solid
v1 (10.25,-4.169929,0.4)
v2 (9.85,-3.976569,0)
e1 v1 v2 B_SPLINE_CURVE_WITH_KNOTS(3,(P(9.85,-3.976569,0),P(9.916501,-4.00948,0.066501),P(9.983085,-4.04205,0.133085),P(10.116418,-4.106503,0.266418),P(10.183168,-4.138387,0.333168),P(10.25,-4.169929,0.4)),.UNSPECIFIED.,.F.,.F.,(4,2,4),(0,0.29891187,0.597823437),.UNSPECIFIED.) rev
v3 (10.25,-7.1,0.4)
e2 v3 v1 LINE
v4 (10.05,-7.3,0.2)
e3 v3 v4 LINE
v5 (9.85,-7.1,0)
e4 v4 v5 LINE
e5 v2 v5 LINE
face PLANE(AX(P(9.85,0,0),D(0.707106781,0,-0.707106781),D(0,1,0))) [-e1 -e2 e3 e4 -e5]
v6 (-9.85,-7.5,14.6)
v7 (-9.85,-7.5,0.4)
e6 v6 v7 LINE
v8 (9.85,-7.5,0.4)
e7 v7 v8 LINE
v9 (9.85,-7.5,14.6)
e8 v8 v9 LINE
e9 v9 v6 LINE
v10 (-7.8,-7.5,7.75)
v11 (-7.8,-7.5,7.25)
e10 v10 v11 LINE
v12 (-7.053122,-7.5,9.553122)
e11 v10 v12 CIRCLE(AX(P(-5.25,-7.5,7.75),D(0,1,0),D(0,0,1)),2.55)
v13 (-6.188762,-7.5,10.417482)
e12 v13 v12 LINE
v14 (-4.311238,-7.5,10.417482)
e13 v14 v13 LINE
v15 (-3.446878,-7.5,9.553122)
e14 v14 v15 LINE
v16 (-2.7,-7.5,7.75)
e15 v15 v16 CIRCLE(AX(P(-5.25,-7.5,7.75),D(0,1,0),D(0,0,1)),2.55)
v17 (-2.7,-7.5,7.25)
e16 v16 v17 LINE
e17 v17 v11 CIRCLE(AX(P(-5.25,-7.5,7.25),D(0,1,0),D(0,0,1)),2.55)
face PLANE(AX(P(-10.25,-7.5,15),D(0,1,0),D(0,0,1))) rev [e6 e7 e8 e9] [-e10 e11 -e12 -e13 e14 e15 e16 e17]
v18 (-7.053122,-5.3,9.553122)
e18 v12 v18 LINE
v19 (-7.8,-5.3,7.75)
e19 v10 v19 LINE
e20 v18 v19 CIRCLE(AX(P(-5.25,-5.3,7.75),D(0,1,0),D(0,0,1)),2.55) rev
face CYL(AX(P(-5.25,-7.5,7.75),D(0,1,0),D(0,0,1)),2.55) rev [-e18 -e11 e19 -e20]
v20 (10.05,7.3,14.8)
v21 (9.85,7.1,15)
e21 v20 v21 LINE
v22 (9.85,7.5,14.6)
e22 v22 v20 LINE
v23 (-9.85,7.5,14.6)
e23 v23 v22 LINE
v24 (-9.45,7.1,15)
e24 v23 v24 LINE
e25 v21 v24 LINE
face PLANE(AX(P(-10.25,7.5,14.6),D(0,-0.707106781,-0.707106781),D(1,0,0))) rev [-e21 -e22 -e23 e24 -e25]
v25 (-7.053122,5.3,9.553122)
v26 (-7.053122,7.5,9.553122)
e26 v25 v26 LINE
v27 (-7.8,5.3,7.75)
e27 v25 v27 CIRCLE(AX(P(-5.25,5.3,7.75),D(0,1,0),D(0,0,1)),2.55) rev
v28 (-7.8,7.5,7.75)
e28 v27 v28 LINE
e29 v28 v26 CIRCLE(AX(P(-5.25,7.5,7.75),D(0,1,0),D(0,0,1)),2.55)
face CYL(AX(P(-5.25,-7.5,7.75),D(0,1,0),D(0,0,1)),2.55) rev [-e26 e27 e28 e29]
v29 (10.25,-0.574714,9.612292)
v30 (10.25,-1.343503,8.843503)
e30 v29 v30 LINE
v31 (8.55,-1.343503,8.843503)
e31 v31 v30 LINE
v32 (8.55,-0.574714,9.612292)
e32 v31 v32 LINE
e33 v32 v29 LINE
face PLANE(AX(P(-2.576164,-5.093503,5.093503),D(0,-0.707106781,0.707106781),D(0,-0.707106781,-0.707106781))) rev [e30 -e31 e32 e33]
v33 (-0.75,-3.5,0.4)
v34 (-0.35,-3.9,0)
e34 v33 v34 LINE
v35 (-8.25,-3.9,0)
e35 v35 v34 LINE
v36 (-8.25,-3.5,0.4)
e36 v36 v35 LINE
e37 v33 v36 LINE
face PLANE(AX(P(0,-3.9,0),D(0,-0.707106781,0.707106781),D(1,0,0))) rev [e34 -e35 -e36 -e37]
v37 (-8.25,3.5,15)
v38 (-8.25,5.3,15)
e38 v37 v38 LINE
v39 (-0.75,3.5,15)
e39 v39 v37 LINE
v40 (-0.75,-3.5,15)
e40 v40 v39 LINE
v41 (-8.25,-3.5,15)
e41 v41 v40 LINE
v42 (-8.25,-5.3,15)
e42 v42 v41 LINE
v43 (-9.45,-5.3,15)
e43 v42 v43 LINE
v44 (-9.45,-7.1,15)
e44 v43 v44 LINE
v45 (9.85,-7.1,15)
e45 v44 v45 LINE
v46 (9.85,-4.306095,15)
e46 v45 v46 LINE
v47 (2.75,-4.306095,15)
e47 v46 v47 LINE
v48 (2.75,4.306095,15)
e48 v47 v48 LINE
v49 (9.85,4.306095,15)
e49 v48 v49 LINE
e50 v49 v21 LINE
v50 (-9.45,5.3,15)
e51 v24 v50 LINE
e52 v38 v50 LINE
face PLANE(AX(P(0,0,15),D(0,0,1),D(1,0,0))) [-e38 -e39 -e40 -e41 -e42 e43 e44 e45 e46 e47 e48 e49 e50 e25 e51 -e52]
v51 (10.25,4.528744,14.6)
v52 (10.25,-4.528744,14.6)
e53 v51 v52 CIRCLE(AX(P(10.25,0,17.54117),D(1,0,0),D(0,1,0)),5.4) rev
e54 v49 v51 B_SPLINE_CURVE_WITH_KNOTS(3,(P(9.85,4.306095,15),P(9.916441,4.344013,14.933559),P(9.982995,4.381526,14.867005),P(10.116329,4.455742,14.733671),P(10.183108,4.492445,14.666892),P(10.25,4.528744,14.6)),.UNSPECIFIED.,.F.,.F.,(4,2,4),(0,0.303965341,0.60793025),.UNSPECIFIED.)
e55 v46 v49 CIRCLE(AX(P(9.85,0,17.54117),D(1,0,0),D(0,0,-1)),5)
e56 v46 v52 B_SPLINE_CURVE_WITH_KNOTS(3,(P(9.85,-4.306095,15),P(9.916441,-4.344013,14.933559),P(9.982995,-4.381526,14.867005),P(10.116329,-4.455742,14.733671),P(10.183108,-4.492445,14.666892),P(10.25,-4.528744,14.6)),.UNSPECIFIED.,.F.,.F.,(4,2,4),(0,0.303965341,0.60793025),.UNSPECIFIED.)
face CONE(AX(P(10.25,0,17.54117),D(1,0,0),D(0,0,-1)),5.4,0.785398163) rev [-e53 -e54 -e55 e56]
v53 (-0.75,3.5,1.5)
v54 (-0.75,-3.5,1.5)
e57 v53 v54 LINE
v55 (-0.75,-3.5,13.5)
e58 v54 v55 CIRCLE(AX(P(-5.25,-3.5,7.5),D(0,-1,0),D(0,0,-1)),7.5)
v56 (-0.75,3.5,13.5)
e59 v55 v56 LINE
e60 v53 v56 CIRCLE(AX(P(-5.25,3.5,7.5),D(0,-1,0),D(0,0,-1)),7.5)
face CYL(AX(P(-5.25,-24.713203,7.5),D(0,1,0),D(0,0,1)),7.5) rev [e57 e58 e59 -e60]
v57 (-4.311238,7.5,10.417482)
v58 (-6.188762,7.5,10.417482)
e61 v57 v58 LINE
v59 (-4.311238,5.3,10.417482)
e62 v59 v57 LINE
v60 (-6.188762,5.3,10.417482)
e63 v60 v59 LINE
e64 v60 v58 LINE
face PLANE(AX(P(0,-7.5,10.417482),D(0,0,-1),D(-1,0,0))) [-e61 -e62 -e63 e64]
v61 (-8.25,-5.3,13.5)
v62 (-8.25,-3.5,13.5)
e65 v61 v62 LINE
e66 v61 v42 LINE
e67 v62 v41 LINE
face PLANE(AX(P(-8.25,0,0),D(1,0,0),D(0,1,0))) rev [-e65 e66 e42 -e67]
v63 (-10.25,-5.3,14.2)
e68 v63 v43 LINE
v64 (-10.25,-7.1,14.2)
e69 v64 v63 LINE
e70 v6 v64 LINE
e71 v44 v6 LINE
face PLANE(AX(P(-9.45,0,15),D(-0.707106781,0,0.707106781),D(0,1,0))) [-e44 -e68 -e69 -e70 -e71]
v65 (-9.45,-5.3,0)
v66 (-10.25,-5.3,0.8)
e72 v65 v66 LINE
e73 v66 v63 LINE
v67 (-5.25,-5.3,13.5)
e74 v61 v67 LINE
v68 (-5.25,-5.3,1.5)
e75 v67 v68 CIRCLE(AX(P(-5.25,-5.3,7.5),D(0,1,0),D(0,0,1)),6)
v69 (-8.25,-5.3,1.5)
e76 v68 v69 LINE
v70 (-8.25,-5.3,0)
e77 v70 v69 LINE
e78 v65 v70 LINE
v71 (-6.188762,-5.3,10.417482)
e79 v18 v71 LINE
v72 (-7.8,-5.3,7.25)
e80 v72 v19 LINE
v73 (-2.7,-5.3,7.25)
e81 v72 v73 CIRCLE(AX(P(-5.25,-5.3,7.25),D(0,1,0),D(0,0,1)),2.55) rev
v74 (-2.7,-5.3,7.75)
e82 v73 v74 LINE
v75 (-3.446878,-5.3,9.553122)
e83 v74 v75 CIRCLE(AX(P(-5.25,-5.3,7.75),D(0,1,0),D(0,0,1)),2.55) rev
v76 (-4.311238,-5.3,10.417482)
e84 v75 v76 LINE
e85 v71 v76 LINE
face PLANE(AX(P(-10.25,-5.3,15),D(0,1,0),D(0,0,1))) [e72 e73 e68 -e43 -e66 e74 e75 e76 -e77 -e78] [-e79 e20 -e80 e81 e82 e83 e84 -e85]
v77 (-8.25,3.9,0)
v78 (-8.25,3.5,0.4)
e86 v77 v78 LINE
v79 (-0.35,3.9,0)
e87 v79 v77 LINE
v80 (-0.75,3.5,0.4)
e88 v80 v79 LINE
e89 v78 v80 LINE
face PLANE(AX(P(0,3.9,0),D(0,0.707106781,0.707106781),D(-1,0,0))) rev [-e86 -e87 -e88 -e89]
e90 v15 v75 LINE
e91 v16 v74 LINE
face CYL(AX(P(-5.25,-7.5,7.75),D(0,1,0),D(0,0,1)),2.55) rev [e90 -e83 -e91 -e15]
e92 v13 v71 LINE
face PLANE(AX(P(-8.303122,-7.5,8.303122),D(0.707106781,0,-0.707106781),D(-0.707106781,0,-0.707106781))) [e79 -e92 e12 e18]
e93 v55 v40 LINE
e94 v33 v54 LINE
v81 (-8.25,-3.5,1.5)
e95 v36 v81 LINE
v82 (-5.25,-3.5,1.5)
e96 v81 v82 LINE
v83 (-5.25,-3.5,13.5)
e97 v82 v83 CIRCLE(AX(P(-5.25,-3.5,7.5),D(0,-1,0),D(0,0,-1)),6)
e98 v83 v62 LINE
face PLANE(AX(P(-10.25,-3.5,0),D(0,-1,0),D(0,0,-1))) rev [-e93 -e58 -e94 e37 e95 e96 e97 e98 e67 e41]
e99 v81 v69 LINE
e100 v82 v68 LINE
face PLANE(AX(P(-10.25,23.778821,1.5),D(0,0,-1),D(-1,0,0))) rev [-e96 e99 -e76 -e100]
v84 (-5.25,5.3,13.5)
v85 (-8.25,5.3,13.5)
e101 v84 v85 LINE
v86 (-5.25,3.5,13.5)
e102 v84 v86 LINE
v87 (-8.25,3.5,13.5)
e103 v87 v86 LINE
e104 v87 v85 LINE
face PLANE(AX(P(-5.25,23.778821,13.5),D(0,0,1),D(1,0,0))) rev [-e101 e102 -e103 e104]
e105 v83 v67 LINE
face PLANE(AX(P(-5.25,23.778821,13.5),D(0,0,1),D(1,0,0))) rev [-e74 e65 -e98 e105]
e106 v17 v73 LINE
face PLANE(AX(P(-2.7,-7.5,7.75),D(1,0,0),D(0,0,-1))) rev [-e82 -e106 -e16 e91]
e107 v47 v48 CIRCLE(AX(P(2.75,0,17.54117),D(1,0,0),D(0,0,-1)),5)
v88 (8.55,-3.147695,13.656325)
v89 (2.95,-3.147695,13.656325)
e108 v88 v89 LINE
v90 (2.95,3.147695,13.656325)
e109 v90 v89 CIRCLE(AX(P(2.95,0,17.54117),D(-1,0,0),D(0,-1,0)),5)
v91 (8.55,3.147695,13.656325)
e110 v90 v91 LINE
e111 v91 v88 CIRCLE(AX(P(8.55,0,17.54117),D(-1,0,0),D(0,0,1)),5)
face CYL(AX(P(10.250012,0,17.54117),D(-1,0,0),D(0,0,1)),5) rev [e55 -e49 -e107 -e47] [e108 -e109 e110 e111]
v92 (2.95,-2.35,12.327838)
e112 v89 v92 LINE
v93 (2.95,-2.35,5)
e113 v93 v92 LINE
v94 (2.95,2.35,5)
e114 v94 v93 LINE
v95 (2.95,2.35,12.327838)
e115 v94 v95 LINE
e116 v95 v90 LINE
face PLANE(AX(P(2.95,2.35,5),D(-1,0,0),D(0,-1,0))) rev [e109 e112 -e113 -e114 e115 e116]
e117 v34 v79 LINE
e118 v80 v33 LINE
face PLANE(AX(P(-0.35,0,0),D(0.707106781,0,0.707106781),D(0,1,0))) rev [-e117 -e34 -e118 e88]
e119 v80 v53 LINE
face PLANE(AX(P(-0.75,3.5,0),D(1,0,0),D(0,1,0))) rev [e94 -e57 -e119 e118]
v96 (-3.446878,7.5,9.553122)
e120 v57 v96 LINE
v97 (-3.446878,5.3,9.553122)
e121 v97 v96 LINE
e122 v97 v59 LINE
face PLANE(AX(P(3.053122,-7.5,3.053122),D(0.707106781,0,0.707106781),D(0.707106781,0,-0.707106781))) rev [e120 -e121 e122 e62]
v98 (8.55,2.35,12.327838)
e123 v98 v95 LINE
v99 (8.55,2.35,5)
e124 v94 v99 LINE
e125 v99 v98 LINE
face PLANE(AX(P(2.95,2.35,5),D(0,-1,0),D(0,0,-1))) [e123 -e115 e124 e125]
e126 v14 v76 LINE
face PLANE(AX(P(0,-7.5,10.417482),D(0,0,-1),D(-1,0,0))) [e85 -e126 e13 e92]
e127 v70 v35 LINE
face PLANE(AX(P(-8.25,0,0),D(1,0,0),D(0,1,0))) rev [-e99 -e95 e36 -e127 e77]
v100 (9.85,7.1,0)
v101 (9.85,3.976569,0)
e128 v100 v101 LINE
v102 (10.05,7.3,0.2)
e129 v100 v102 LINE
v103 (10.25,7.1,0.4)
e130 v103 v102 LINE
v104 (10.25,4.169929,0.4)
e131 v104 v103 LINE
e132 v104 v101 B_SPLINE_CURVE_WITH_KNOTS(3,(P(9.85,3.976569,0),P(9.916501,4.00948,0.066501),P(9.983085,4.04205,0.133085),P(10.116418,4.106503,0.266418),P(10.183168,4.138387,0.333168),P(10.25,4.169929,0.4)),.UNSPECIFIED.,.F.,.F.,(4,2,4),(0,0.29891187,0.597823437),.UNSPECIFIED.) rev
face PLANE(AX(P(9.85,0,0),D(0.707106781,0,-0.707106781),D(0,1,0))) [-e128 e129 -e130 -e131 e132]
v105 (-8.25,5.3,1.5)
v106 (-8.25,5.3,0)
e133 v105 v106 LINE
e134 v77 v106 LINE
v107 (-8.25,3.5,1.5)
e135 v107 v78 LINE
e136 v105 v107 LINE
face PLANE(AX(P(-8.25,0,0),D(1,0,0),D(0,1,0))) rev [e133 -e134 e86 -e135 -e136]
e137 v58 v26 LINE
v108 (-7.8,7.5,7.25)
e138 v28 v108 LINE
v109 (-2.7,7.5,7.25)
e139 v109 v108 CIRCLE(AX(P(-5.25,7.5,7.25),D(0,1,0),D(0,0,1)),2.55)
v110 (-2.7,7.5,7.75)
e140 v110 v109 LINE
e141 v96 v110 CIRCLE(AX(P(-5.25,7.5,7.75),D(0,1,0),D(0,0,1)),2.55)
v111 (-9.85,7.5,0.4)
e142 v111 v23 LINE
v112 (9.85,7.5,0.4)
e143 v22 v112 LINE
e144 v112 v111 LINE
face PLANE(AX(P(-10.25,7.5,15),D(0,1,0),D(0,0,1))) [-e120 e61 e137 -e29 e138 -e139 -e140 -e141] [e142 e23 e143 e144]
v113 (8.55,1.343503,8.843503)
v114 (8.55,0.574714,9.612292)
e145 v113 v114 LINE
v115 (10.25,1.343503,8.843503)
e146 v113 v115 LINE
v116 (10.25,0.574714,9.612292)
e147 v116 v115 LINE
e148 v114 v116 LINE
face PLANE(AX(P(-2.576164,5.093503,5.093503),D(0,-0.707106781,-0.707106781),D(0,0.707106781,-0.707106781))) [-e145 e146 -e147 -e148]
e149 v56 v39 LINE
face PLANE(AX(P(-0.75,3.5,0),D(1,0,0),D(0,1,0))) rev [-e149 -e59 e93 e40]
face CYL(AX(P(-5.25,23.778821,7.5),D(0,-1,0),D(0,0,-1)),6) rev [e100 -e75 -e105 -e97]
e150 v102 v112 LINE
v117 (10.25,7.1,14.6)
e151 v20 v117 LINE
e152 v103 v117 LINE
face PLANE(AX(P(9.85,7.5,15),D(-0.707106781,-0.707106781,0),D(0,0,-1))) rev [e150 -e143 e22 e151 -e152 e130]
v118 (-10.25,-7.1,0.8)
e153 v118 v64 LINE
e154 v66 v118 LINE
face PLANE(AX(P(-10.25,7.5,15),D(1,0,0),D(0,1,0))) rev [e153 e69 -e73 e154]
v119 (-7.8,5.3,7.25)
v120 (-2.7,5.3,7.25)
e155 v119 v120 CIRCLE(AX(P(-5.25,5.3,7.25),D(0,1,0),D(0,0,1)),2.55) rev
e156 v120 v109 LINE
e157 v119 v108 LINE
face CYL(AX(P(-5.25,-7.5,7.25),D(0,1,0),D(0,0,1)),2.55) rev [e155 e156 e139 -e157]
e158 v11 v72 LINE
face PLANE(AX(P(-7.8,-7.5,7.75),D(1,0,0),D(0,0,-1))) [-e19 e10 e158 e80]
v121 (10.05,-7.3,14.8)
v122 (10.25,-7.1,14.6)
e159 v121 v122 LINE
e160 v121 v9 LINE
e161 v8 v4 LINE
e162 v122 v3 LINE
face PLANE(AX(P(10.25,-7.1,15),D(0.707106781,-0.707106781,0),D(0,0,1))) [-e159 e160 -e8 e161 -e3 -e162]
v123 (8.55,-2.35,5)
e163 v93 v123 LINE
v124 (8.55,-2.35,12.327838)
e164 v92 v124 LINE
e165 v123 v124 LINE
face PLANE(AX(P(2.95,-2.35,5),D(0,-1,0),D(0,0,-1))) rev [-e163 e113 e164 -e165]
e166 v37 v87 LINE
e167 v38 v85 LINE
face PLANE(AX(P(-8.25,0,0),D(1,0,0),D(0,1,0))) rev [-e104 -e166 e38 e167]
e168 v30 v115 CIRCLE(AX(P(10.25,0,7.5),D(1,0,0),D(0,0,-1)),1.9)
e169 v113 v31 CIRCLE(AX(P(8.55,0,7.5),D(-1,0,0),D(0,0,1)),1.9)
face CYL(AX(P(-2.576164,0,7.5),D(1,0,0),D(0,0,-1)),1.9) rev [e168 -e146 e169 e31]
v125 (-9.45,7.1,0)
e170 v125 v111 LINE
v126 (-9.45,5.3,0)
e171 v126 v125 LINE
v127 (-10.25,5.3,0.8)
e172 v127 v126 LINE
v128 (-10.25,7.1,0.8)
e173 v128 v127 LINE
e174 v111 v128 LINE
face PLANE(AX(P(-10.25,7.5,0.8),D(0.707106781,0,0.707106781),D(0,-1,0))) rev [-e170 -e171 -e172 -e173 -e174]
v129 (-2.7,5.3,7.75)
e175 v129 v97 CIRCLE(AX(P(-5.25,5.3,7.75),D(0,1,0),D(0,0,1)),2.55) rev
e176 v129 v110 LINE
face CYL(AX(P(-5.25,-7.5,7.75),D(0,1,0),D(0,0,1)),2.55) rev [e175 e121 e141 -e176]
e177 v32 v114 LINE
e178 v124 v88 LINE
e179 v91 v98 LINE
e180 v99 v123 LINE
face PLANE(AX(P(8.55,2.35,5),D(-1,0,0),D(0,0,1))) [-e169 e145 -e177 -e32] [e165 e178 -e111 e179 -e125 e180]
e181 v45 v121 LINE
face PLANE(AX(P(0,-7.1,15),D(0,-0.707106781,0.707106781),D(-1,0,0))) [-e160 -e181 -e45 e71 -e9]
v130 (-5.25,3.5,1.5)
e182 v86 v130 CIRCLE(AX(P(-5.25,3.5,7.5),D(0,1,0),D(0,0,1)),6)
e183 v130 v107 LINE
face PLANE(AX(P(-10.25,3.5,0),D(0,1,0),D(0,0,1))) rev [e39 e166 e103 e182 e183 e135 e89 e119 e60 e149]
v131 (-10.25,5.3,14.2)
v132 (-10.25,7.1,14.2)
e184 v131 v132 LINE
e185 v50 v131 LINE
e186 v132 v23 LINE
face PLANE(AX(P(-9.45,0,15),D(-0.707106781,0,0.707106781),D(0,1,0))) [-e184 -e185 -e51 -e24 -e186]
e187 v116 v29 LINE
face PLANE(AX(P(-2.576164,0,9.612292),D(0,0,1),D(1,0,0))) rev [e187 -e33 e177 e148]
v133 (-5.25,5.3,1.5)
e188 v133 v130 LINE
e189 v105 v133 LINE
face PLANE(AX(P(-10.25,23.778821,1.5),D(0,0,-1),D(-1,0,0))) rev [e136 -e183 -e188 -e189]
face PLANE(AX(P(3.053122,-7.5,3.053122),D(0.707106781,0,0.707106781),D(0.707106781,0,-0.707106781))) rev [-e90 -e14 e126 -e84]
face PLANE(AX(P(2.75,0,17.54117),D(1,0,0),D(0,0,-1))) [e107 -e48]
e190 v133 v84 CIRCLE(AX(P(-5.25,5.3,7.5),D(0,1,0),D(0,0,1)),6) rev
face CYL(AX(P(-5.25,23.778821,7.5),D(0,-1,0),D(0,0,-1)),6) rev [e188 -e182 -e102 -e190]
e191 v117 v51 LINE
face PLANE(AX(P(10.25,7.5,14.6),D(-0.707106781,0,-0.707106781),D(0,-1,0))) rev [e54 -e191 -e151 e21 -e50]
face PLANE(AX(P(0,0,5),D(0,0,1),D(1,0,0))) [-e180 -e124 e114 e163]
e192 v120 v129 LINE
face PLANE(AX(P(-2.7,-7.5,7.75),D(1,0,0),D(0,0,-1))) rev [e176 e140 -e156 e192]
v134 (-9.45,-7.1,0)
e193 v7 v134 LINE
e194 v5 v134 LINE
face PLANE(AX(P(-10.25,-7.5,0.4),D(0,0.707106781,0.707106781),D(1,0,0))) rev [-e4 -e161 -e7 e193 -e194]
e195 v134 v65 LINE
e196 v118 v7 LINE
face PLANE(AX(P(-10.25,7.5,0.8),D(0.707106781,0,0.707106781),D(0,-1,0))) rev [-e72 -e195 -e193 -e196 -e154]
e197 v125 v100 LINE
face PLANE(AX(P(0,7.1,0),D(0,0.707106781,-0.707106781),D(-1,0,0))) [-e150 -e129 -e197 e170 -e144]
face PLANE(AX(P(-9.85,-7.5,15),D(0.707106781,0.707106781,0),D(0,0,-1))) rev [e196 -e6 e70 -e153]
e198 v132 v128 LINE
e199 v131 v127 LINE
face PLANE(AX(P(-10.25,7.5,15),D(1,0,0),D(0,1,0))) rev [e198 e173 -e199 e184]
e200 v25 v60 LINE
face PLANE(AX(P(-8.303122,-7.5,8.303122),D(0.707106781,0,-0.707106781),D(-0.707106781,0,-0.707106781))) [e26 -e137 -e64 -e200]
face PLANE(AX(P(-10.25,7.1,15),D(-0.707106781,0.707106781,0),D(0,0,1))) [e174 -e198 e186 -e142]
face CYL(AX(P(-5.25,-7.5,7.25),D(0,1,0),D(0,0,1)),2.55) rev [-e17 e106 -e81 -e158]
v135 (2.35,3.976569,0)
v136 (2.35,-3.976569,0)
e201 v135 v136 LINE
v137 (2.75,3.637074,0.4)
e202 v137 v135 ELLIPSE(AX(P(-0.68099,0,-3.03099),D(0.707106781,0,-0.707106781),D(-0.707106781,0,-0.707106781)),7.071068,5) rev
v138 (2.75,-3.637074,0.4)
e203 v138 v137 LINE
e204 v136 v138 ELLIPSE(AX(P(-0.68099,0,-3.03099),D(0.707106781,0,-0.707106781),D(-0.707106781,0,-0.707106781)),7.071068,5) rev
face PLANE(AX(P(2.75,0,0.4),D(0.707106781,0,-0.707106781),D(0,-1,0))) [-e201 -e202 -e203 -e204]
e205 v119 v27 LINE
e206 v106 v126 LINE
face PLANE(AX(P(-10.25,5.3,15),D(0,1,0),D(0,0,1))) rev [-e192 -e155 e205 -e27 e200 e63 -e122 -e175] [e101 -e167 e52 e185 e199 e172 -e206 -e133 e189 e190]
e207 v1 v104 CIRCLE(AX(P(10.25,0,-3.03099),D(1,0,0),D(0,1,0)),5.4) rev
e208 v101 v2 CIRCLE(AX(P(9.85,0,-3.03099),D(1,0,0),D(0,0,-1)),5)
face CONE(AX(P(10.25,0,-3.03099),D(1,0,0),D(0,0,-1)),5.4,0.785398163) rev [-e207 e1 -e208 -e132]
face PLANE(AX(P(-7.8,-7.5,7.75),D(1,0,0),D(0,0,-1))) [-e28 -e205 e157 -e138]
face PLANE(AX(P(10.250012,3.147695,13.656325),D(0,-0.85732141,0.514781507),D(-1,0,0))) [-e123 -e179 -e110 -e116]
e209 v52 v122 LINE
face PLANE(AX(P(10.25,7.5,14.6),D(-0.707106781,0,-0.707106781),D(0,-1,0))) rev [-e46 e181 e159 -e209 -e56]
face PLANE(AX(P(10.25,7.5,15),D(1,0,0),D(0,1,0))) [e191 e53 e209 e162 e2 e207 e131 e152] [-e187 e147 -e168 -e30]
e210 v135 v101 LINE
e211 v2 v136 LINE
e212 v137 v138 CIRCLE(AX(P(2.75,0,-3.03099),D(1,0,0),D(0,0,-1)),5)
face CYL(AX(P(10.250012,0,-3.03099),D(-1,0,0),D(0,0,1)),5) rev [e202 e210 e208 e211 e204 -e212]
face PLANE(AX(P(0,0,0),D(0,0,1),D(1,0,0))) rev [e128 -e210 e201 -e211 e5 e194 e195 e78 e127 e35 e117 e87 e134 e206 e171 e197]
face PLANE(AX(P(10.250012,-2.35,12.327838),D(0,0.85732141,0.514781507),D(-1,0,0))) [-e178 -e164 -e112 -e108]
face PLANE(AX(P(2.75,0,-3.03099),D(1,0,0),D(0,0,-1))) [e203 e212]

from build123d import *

# Parameters (mm, degrees)
SKETCH_1_W               = 20.5
SKETCH_1_H               = 15
EXTRUDE_1_DEPTH          = 15
CUT_EXTRUDE_1_DEPTH      = 27.485845276
CUT_EXTRUDE_1_DEPTH_BACK = 7.5
SKETCH_2_R               = 5
SKETCH_4_W               = 5.6
SKETCH_4_H               = 4.7
CUT_EXTRUDE_4_DEPTH      = 10
SKETCH_5_W               = 9.5
SKETCH_5_H               = 7
CUT_EXTRUDE_5_DEPTH      = 20.654834011
CUT_EXTRUDE_2_DEPTH      = 7.3
CUT_EXTRUDE_6_DEPTH      = 24.55976443
CUT_EXTRUDE_START        = -1.8
CUT_EXTRUDE_7_DEPTH      = 10.6
SKETCH_11_W              = 15.106844648
SKETCH_11_H              = 10.6
CUT_EXTRUDE_8_DEPTH      = 2
SKETCH_12_R              = 7.5
CUT_EXTRUDE_9_DEPTH      = 7
CHAMFER_1_SIZE           = 0.4
CHAMFER_2_SIZE           = 0.4
CHAMFER_4_SIZE           = 0.8
CHAMFER_7_SIZE           = 0.8
CHAMFER_8_SIZE           = 0.4


# Some blends are built 0.0001 mm under size
with BuildPart() as part:
    # 草图1 → 凸台-拉伸1 (new body)
    with BuildSketch(Plane.XY):
        Rectangle(SKETCH_1_W, SKETCH_1_H)
    extrude(amount=EXTRUDE_1_DEPTH)

    # 草图2 → 切除-拉伸1 (cut, two sides: drawn at the far end of the back side and taken through both)
    with BuildSketch(Plane(origin=(10.25, 0, 0), x_dir=(0, 0, -1), z_dir=(1, 0, 0)).offset(-CUT_EXTRUDE_1_DEPTH_BACK)):
        with Locations((-17.541169992, 0)):
            Circle(SKETCH_2_R)
        with Locations((3.030989937, 0)):
            Circle(SKETCH_2_R)
    extrude(amount=CUT_EXTRUDE_1_DEPTH + CUT_EXTRUDE_1_DEPTH_BACK, mode=Mode.SUBTRACT)

    # 草图4 → 切除-拉伸4 (cut)
    with BuildSketch(Plane.XY.offset(15)):
        with Locations((5.75, 0)):
            Rectangle(SKETCH_4_W, SKETCH_4_H)
    extrude(amount=-CUT_EXTRUDE_4_DEPTH, mode=Mode.SUBTRACT)

    # 草图5 → 切除-拉伸5 (cut, through all)
    with BuildSketch(Plane.XY.offset(15)):
        with Locations((-5.5, 0)):
            Rectangle(SKETCH_5_W, SKETCH_5_H)
    extrude(amount=-CUT_EXTRUDE_5_DEPTH, mode=Mode.SUBTRACT)

    # 草图3 → 切除-拉伸2 (cut)
    with BuildSketch(Plane(origin=(10.25, 0, 0), x_dir=(0, 0, -1), z_dir=(1, 0, 0))):
        with BuildLine():
            Line((-9.612291748, -0.57471402), (-8.843502884, -1.343502884))
            ThreePointArc((-8.843502884, -1.343502884), (-5.6, 0), (-8.843502884, 1.343502884))
            Line((-8.843502884, 1.343502884), (-9.612291748, 0.57471402))
            Line((-9.612291748, 0.57471402), (-9.612291748, -0.57471402))
        make_face()
    extrude(amount=-CUT_EXTRUDE_2_DEPTH, mode=Mode.SUBTRACT)

    # 草图9 → 切除-拉伸6 (cut, through all)
    with BuildSketch(Plane(origin=(0, 7.5, 0), x_dir=(1, 0, 0), z_dir=(0, 1, 0))):
        with BuildLine():
            Line((-7.8, -7.25), (-7.8, -7.75))
            ThreePointArc((-7.8, -7.75), (-7.605892808, -8.725842753), (-7.053122292, -9.553122292))
            Line((-7.053122292, -9.553122292), (-6.188762276, -10.417482308))
            Line((-6.188762276, -10.417482308), (-4.311237724, -10.417482308))
            Line((-4.311237724, -10.417482308), (-3.446877708, -9.553122292))
            ThreePointArc((-3.446877708, -9.553122292), (-2.894107192, -8.725842753), (-2.7, -7.75))
            Line((-2.7, -7.75), (-2.7, -7.25))
            ThreePointArc((-2.7, -7.25), (-5.25, -4.7), (-7.8, -7.25))
        make_face()
    extrude(amount=-CUT_EXTRUDE_6_DEPTH, mode=Mode.SUBTRACT)

    # 草图10 → 切除-拉伸7 (cut)
    with BuildSketch(Plane.XZ.offset(-3.5).offset(CUT_EXTRUDE_START)):
        with BuildLine():
            Line((-5.25, 13.5), (-10.25, 13.5))
            Line((-10.25, 13.5), (-10.25, 1.5))
            Line((-10.25, 1.5), (-5.25, 1.5))
            ThreePointArc((-5.25, 1.5), (0.75, 7.5), (-5.25, 13.5))
        make_face()
    extrude(amount=CUT_EXTRUDE_7_DEPTH, mode=Mode.SUBTRACT)

    # 草图11 → 切除-拉伸8 (cut)
    with BuildSketch(Plane.ZY.offset(10.25)):
        with Locations((7.446577676, 0)):
            Rectangle(SKETCH_11_W, SKETCH_11_H)
    extrude(amount=-CUT_EXTRUDE_8_DEPTH, mode=Mode.SUBTRACT)

    # 草图12 → 切除-拉伸9 (cut)
    with BuildSketch(Plane.XZ.offset(-3.5)):
        with Locations((-5.25, 7.5)):
            Circle(SKETCH_12_R)
    extrude(amount=CUT_EXTRUDE_9_DEPTH, mode=Mode.SUBTRACT)

    # 倒角1
    chamfer_1_edges = [part.edges().sort_by_distance(p)[0] for p in [
        (10.25, 5.903047554, 15),
        (10.25, -5.738284436, 0),
        (10.25, -5.903047554, 15),
        (10.25, 0, 12.541169992),
        (10.25, 0, 1.969010063),
        (10.25, 5.738284436, 0),
        (10.25, 7.5, 7.5),
        (10.25, -7.5, 7.5),
    ]]
    chamfer(chamfer_1_edges, length=CHAMFER_1_SIZE)

    # 倒角2
    chamfer_2_edges = [part.edges().sort_by_distance(p)[0] for p in [
        (-0.2, 7.5, 15),
        (-0.2, 7.5, 0),
        (-0.2, -7.5, 0),
        (-10.25, 7.5, 7.5),
        (-10.25, -7.5, 7.5),
        (-0.2, -7.5, 15),
    ]]
    chamfer(chamfer_2_edges, length=CHAMFER_2_SIZE)

    # 倒角4
    chamfer_4_edges = [part.edges().sort_by_distance(p)[0] for p in [
        (-10.25, 6.2, 0),
        (-10.25, -6.2, 0),
        (-10.25, -6.2, 15),
        (-10.25, 6.2, 15),
    ]]
    chamfer(chamfer_4_edges, length=CHAMFER_4_SIZE - 0.0001)  # a hair under: the kernel refuses the full size

    # 倒角7
    # the kernel refuses this chamfer: 0.8 mm, written as the material it takes off along each edge
    with BuildSketch(Plane(origin=(2.95, -2.35, 13.127837918), x_dir=(0, -0.8336429325250914, 0.5523037760607525), z_dir=(1, 0, 0))) as chamfer_7_piece_1:
        with BuildLine():
            Line((0.956878157, 0), (-CHAMFER_7_SIZE * 0.552303776061, CHAMFER_7_SIZE * 0.833642932525))
            Line((-CHAMFER_7_SIZE * 0.552303776061, CHAMFER_7_SIZE * 0.833642932525), (0, 0))
            ThreePointArc((0, 0), (0.492968028, 0.022921924), (0.956878157, 0))
        make_face()
    extrude(amount=5.6, mode=Mode.SUBTRACT)
    with BuildSketch(Plane(origin=(2.95, 2.35, 13.127837918), x_dir=(0, 0.8336429325250913, 0.5523037760607528), z_dir=(1, 0, 0))) as chamfer_7_piece_2:
        with BuildLine():
            Line((0.956878157, 0), (-CHAMFER_7_SIZE * 0.552303776061, -CHAMFER_7_SIZE * 0.833642932525))
            Line((-CHAMFER_7_SIZE * 0.552303776061, -CHAMFER_7_SIZE * 0.833642932525), (0, 0))
            ThreePointArc((0, 0), (0.492968028, -0.022921924), (0.956878157, 0))
        make_face()
    extrude(amount=5.6, mode=Mode.SUBTRACT)

    # 倒角8
    chamfer_8_edges = [part.edges().sort_by_distance(p)[0] for p in [
        (2.75, 0, 0),
        (-4.5, -3.5, 0),
        (-0.75, 0, 0),
        (-4.5, 3.5, 0),
    ]]
    chamfer(chamfer_8_edges, length=CHAMFER_8_SIZE)


solid = part.part
